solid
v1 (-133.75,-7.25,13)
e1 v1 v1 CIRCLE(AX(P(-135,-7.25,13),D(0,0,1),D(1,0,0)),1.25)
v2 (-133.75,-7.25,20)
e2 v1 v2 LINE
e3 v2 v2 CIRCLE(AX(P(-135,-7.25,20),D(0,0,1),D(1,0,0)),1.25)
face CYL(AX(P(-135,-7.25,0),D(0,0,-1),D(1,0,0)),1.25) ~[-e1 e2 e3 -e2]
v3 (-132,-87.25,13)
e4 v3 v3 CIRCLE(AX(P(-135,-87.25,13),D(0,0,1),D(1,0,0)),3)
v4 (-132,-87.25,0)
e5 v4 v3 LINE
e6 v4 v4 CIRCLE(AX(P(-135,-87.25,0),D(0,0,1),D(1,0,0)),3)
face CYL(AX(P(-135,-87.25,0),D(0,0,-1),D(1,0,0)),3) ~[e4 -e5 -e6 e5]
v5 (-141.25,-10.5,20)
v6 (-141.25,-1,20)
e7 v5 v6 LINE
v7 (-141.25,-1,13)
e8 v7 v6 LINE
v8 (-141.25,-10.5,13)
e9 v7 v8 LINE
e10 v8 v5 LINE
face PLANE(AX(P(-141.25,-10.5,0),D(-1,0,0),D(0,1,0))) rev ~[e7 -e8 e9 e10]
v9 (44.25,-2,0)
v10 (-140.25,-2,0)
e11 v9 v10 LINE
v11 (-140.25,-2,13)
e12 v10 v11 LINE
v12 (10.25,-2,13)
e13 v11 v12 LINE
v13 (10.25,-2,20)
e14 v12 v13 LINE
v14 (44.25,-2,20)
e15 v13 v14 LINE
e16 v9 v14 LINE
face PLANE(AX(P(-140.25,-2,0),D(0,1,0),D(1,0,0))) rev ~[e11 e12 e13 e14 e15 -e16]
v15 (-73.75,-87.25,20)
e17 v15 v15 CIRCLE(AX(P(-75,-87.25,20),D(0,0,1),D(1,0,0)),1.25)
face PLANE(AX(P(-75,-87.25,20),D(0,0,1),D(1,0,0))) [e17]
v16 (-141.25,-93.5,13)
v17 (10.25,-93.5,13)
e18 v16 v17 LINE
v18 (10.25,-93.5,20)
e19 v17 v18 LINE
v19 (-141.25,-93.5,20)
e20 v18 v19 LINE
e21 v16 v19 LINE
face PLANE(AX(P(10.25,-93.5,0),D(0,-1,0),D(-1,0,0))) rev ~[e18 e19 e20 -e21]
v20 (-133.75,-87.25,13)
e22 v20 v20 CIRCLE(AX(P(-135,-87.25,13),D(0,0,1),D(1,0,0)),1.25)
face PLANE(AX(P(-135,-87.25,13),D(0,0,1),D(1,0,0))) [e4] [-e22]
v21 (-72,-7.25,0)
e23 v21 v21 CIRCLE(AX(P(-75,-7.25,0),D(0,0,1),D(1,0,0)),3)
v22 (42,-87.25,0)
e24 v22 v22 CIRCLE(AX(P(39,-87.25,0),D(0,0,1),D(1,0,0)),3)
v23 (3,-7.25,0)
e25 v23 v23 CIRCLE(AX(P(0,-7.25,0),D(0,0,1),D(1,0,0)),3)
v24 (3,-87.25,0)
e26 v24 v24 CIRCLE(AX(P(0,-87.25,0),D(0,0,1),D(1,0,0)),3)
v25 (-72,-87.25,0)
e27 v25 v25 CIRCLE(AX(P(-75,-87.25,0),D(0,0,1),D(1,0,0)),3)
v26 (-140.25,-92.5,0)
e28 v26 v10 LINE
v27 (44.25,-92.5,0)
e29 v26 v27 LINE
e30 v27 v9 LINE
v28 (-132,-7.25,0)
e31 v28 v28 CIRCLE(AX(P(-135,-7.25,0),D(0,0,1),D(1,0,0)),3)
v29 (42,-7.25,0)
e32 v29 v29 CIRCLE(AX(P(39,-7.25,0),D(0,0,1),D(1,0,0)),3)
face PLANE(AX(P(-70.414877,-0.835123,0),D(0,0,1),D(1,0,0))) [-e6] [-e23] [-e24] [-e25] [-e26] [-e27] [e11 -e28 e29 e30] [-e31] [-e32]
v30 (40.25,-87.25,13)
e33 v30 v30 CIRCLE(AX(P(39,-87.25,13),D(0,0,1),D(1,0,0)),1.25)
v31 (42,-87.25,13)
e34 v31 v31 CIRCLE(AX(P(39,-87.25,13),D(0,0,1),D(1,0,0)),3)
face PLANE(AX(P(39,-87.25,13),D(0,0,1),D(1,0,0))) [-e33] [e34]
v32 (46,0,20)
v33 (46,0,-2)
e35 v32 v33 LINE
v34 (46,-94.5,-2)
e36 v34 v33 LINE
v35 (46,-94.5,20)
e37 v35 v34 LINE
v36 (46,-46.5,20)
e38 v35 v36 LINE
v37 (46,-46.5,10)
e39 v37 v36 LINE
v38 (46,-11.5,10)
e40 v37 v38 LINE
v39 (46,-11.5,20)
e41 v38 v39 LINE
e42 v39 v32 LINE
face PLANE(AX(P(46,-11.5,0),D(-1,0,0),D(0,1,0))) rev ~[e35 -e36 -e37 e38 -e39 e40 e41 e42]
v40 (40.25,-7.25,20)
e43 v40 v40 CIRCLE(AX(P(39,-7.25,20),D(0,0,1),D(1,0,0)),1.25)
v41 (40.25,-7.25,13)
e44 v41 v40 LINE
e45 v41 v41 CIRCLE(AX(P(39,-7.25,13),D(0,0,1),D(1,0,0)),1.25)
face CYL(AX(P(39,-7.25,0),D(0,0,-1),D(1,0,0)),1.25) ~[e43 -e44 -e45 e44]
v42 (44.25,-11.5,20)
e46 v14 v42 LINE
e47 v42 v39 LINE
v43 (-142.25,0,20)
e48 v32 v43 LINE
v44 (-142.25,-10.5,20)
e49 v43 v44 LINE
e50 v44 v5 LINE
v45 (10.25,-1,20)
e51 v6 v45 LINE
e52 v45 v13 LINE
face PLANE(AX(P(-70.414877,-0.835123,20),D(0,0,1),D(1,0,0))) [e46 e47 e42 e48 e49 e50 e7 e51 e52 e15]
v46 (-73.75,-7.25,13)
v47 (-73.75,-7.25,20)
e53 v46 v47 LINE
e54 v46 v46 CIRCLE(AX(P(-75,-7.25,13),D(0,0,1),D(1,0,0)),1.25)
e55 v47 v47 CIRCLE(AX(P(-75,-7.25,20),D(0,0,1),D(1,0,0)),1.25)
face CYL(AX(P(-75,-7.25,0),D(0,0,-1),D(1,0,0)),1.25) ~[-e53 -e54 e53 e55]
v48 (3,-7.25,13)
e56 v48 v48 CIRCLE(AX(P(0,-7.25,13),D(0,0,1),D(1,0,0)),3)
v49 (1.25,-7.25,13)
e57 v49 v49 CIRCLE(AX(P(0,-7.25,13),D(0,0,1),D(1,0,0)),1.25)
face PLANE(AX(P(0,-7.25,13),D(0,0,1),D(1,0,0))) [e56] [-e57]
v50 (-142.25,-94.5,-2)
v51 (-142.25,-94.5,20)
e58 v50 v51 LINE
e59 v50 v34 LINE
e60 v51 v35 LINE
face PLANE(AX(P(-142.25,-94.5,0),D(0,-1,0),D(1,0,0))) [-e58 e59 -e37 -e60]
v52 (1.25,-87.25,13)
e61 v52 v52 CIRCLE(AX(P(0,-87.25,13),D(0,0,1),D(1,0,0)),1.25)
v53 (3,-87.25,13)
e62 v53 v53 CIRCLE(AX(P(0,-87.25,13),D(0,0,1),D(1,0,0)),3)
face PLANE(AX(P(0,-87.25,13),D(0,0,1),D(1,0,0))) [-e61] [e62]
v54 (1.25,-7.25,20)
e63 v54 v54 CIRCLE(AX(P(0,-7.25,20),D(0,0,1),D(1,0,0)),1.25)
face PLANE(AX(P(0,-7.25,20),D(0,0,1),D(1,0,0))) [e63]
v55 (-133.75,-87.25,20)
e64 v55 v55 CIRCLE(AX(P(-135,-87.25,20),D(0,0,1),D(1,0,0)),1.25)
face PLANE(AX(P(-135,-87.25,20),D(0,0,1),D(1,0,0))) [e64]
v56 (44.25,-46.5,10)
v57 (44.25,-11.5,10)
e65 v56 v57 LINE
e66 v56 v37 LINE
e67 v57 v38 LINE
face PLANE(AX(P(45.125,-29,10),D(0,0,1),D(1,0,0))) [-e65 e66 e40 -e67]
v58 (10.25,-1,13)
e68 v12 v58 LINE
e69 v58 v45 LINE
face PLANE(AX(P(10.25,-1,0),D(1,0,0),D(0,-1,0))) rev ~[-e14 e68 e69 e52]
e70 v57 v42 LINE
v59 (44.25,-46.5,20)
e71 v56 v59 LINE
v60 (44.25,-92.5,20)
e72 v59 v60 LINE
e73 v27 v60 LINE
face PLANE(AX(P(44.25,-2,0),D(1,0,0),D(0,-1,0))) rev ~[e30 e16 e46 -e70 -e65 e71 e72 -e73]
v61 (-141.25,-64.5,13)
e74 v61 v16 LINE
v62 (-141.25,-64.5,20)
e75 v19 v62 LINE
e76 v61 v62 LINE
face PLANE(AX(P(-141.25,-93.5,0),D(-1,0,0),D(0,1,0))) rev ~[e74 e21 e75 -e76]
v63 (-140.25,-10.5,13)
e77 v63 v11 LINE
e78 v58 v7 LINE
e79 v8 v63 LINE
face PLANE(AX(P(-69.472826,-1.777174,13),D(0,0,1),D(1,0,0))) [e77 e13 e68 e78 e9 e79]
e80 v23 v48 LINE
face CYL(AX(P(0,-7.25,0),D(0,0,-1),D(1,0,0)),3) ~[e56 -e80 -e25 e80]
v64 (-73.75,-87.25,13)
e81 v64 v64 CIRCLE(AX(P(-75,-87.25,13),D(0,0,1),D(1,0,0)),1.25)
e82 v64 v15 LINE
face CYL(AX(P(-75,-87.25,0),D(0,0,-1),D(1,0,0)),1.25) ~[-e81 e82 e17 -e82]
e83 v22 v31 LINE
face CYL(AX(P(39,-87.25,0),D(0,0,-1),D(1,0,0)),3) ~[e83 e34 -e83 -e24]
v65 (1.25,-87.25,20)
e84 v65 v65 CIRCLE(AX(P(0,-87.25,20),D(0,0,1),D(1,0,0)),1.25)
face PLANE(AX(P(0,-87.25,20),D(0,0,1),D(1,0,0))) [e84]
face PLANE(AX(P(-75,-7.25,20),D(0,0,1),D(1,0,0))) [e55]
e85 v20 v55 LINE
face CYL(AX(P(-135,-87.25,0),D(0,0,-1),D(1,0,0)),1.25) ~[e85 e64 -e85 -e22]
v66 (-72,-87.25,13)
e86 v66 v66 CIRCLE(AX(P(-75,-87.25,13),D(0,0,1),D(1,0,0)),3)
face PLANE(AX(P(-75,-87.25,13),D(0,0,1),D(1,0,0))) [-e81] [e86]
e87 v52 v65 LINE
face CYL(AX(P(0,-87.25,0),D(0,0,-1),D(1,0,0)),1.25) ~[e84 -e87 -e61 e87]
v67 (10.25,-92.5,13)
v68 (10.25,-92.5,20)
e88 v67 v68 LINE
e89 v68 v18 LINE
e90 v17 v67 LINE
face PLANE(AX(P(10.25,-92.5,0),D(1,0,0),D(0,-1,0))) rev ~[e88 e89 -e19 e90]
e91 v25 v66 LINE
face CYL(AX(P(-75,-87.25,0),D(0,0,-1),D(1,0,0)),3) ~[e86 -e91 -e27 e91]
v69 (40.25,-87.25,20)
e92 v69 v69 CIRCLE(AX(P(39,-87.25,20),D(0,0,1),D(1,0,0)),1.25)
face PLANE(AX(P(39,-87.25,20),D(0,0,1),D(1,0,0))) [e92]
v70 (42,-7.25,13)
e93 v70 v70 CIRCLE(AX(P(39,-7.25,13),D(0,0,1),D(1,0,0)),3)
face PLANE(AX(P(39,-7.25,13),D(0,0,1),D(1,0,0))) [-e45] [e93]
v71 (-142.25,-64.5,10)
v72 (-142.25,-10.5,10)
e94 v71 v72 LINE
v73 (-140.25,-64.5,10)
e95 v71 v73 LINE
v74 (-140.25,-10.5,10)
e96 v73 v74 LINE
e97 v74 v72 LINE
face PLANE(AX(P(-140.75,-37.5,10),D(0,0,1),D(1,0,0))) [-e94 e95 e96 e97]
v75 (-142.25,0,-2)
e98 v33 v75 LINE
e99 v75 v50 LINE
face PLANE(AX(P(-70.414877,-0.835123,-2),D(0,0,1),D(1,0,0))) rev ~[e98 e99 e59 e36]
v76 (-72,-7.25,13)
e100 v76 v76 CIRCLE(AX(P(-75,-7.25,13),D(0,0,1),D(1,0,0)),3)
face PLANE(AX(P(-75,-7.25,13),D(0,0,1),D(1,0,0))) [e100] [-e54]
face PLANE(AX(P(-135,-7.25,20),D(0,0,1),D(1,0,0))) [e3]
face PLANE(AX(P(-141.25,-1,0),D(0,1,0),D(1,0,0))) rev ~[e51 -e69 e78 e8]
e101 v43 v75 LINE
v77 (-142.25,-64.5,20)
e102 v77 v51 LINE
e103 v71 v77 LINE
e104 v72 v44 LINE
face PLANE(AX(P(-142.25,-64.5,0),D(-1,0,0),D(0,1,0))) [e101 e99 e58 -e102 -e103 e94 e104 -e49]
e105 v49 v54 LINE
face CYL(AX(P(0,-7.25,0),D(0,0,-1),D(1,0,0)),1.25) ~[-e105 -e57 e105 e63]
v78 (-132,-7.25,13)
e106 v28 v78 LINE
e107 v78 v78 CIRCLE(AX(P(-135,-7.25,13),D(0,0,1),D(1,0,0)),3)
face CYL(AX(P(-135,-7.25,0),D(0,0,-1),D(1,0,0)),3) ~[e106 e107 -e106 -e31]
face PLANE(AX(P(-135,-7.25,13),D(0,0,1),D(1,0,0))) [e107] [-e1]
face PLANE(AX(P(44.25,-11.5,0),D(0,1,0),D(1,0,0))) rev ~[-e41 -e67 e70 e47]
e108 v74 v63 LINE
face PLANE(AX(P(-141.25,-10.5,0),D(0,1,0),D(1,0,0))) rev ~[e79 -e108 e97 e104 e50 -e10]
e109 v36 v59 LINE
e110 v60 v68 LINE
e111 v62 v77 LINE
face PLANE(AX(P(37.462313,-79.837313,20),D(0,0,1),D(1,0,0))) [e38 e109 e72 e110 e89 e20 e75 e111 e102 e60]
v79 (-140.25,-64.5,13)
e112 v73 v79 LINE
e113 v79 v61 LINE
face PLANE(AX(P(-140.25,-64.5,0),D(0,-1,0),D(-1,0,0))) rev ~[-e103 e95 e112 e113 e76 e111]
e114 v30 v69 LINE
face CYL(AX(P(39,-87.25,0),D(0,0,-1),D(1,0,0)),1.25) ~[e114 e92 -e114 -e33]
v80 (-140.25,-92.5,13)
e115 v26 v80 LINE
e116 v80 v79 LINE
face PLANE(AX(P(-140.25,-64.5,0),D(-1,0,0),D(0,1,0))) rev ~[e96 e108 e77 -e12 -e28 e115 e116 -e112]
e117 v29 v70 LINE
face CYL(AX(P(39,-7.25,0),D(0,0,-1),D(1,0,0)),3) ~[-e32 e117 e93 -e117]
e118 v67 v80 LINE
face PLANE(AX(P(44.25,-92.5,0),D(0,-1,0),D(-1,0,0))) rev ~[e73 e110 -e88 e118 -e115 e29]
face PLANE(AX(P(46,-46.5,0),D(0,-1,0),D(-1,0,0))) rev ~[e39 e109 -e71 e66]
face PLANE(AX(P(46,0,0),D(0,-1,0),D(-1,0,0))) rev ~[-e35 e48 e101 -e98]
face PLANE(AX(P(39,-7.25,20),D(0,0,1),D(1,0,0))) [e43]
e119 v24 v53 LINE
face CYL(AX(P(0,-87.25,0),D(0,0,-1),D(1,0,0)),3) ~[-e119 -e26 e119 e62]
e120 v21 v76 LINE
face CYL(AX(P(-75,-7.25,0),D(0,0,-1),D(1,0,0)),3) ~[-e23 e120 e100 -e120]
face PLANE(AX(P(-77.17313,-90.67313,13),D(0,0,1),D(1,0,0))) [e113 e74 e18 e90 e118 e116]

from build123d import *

# Parameters (mm, degrees)
F0_W     = 1
F0_H     = 54
F0_W_2   = 1.75
F0_H_2   = 35
F0_R     = 3
F0_R_2   = 1.25
F1_DEPTH = 2
F2_DEPTH = 20
F3_DEPTH = 13
F4_DEPTH = 10
F5_DEPTH = 20
F6_DEPTH = 13


# Not quite as in the source:
# - a feature names something its author has since deleted; it is built from what else it names


with BuildPart() as f1:
    # F0 (on Top) → F1 (new body)
    with BuildSketch(Plane.XY):
        Polygon((10.25, 0), (-142.25, 0), (-142.25, -10.5), (-141.25, -10.5), (-141.25, -1), (10.25, -1), align=None)
        Polygon((46, 0), (10.25, 0), (10.25, -1), (10.25, -2), (44.25, -2), (44.25, -11.5), (46, -11.5), align=None)
        with Locations((-141.75, -37.5)):
            Rectangle(F0_W, F0_H)
        Polygon((10.25, -2), (10.25, -1), (-141.25, -1), (-141.25, -10.5), (-140.25, -10.5), (-140.25, -2), align=None)
        Polygon((-141.25, -64.5), (-142.25, -64.5), (-142.25, -94.5), (10.25, -94.5), (10.25, -93.5), (-141.25, -93.5), align=None)
        with Locations((-140.75, -37.5)):
            Rectangle(F0_W, F0_H)
        with Locations((45.125, -29)):
            Rectangle(F0_W_2, F0_H_2)
        Polygon((44.25, -2), (10.25, -2), (-140.25, -2), (-140.25, -10.5), (-140.25, -64.5), (-140.25, -92.5), (10.25, -92.5), (44.25, -92.5), (44.25, -46.5), (44.25, -11.5), align=None)
        with Locations((-135, -87.25)):
            Circle(F0_R, mode=Mode.SUBTRACT)
        with Locations((-75, -87.25)):
            Circle(F0_R, mode=Mode.SUBTRACT)
        with Locations((0, -87.25)):
            Circle(F0_R, mode=Mode.SUBTRACT)
        with Locations((39, -87.25)):
            Circle(F0_R, mode=Mode.SUBTRACT)
        with Locations((-135, -7.25)):
            Circle(F0_R, mode=Mode.SUBTRACT)
        with Locations((-75, -7.25)):
            Circle(F0_R, mode=Mode.SUBTRACT)
        with Locations((0, -7.25)):
            Circle(F0_R, mode=Mode.SUBTRACT)
        with Locations((39, -7.25)):
            Circle(F0_R, mode=Mode.SUBTRACT)
        Polygon((-140.25, -64.5), (-141.25, -64.5), (-141.25, -93.5), (10.25, -93.5), (10.25, -92.5), (-140.25, -92.5), align=None)
        Polygon((46, -94.5), (46, -46.5), (44.25, -46.5), (44.25, -92.5), (10.25, -92.5), (10.25, -93.5), (10.25, -94.5), align=None)
        with Locations((-135, -87.25)):
            Circle(F0_R)
        with Locations((-135, -87.25)):
            Circle(F0_R_2, mode=Mode.SUBTRACT)
        with Locations((-135, -7.25)):
            Circle(F0_R)
        with Locations((-135, -7.25)):
            Circle(F0_R_2, mode=Mode.SUBTRACT)
        with Locations((-75, -87.25)):
            Circle(F0_R)
        with Locations((-75, -87.25)):
            Circle(F0_R_2, mode=Mode.SUBTRACT)
        with Locations((-75, -7.25)):
            Circle(F0_R)
        with Locations((-75, -7.25)):
            Circle(F0_R_2, mode=Mode.SUBTRACT)
        with Locations((0, -7.25)):
            Circle(F0_R)
        with Locations((0, -7.25)):
            Circle(F0_R_2, mode=Mode.SUBTRACT)
        with Locations((0, -87.25)):
            Circle(F0_R)
        with Locations((0, -87.25)):
            Circle(F0_R_2, mode=Mode.SUBTRACT)
        with Locations((39, -87.25)):
            Circle(F0_R)
        with Locations((39, -87.25)):
            Circle(F0_R_2, mode=Mode.SUBTRACT)
        with Locations((39, -7.25)):
            Circle(F0_R)
        with Locations((39, -7.25)):
            Circle(F0_R_2, mode=Mode.SUBTRACT)
        with Locations((-135, -87.25)):
            Circle(F0_R_2)
        with Locations((-75, -87.25)):
            Circle(F0_R_2)
        with Locations((0, -87.25)):
            Circle(F0_R_2)
        with Locations((39, -87.25)):
            Circle(F0_R_2)
        with Locations((-135, -7.25)):
            Circle(F0_R_2)
        with Locations((-75, -7.25)):
            Circle(F0_R_2)
        with Locations((0, -7.25)):
            Circle(F0_R_2)
        with Locations((39, -7.25)):
            Circle(F0_R_2)
    extrude(amount=-F1_DEPTH)

    # F0 (on Top) → F2 (join)
    with BuildSketch(Plane.XY):
        Polygon((10.25, 0), (-142.25, 0), (-142.25, -10.5), (-141.25, -10.5), (-141.25, -1), (10.25, -1), align=None)
        Polygon((46, 0), (10.25, 0), (10.25, -1), (10.25, -2), (44.25, -2), (44.25, -11.5), (46, -11.5), align=None)
        Polygon((46, -94.5), (46, -46.5), (44.25, -46.5), (44.25, -92.5), (10.25, -92.5), (10.25, -93.5), (10.25, -94.5), align=None)
        Polygon((-141.25, -64.5), (-142.25, -64.5), (-142.25, -94.5), (10.25, -94.5), (10.25, -93.5), (-141.25, -93.5), align=None)
    extrude(amount=F2_DEPTH)

    # F0 (on Top) → F3 (join)
    with BuildSketch(Plane.XY):
        Polygon((10.25, -2), (10.25, -1), (-141.25, -1), (-141.25, -10.5), (-140.25, -10.5), (-140.25, -2), align=None)
        Polygon((-140.25, -64.5), (-141.25, -64.5), (-141.25, -93.5), (10.25, -93.5), (10.25, -92.5), (-140.25, -92.5), align=None)
    extrude(amount=F3_DEPTH)

    # F0 (on Top) → F4 (join)
    with BuildSketch(Plane.XY):
        with Locations((-140.75, -37.5)):
            Rectangle(F0_W, F0_H)
        with Locations((-141.75, -37.5)):
            Rectangle(F0_W, F0_H)
        with Locations((45.125, -29)):
            Rectangle(F0_W_2, F0_H_2)
    extrude(amount=F4_DEPTH)

    # F0 (on Top) → F5 (join)
    with BuildSketch(Plane.XY):
        with Locations((-135, -7.25)):
            Circle(F0_R_2)
        with Locations((-75, -7.25)):
            Circle(F0_R_2)
        with Locations((0, -7.25)):
            Circle(F0_R_2)
        with Locations((39, -7.25)):
            Circle(F0_R_2)
        with Locations((39, -87.25)):
            Circle(F0_R_2)
        with Locations((0, -87.25)):
            Circle(F0_R_2)
        with Locations((-75, -87.25)):
            Circle(F0_R_2)
        with Locations((-135, -87.25)):
            Circle(F0_R_2)
    extrude(amount=F5_DEPTH)

    # F0 (on Top) → F6 (join)
    with BuildSketch(Plane.XY):
        with Locations((-135, -7.25)):
            Circle(F0_R)
        with Locations((-135, -7.25)):
            Circle(F0_R_2, mode=Mode.SUBTRACT)
        with Locations((-75, -7.25)):
            Circle(F0_R)
        with Locations((-75, -7.25)):
            Circle(F0_R_2, mode=Mode.SUBTRACT)
        with Locations((0, -7.25)):
            Circle(F0_R)
        with Locations((0, -7.25)):
            Circle(F0_R_2, mode=Mode.SUBTRACT)
        with Locations((39, -7.25)):
            Circle(F0_R)
        with Locations((39, -7.25)):
            Circle(F0_R_2, mode=Mode.SUBTRACT)
        with Locations((-135, -87.25)):
            Circle(F0_R)
        with Locations((-135, -87.25)):
            Circle(F0_R_2, mode=Mode.SUBTRACT)
        with Locations((-75, -87.25)):
            Circle(F0_R)
        with Locations((-75, -87.25)):
            Circle(F0_R_2, mode=Mode.SUBTRACT)
        with Locations((0, -87.25)):
            Circle(F0_R)
        with Locations((0, -87.25)):
            Circle(F0_R_2, mode=Mode.SUBTRACT)
        with Locations((39, -87.25)):
            Circle(F0_R)
        with Locations((39, -87.25)):
            Circle(F0_R_2, mode=Mode.SUBTRACT)
    extrude(amount=F6_DEPTH)


solid = f1.part
